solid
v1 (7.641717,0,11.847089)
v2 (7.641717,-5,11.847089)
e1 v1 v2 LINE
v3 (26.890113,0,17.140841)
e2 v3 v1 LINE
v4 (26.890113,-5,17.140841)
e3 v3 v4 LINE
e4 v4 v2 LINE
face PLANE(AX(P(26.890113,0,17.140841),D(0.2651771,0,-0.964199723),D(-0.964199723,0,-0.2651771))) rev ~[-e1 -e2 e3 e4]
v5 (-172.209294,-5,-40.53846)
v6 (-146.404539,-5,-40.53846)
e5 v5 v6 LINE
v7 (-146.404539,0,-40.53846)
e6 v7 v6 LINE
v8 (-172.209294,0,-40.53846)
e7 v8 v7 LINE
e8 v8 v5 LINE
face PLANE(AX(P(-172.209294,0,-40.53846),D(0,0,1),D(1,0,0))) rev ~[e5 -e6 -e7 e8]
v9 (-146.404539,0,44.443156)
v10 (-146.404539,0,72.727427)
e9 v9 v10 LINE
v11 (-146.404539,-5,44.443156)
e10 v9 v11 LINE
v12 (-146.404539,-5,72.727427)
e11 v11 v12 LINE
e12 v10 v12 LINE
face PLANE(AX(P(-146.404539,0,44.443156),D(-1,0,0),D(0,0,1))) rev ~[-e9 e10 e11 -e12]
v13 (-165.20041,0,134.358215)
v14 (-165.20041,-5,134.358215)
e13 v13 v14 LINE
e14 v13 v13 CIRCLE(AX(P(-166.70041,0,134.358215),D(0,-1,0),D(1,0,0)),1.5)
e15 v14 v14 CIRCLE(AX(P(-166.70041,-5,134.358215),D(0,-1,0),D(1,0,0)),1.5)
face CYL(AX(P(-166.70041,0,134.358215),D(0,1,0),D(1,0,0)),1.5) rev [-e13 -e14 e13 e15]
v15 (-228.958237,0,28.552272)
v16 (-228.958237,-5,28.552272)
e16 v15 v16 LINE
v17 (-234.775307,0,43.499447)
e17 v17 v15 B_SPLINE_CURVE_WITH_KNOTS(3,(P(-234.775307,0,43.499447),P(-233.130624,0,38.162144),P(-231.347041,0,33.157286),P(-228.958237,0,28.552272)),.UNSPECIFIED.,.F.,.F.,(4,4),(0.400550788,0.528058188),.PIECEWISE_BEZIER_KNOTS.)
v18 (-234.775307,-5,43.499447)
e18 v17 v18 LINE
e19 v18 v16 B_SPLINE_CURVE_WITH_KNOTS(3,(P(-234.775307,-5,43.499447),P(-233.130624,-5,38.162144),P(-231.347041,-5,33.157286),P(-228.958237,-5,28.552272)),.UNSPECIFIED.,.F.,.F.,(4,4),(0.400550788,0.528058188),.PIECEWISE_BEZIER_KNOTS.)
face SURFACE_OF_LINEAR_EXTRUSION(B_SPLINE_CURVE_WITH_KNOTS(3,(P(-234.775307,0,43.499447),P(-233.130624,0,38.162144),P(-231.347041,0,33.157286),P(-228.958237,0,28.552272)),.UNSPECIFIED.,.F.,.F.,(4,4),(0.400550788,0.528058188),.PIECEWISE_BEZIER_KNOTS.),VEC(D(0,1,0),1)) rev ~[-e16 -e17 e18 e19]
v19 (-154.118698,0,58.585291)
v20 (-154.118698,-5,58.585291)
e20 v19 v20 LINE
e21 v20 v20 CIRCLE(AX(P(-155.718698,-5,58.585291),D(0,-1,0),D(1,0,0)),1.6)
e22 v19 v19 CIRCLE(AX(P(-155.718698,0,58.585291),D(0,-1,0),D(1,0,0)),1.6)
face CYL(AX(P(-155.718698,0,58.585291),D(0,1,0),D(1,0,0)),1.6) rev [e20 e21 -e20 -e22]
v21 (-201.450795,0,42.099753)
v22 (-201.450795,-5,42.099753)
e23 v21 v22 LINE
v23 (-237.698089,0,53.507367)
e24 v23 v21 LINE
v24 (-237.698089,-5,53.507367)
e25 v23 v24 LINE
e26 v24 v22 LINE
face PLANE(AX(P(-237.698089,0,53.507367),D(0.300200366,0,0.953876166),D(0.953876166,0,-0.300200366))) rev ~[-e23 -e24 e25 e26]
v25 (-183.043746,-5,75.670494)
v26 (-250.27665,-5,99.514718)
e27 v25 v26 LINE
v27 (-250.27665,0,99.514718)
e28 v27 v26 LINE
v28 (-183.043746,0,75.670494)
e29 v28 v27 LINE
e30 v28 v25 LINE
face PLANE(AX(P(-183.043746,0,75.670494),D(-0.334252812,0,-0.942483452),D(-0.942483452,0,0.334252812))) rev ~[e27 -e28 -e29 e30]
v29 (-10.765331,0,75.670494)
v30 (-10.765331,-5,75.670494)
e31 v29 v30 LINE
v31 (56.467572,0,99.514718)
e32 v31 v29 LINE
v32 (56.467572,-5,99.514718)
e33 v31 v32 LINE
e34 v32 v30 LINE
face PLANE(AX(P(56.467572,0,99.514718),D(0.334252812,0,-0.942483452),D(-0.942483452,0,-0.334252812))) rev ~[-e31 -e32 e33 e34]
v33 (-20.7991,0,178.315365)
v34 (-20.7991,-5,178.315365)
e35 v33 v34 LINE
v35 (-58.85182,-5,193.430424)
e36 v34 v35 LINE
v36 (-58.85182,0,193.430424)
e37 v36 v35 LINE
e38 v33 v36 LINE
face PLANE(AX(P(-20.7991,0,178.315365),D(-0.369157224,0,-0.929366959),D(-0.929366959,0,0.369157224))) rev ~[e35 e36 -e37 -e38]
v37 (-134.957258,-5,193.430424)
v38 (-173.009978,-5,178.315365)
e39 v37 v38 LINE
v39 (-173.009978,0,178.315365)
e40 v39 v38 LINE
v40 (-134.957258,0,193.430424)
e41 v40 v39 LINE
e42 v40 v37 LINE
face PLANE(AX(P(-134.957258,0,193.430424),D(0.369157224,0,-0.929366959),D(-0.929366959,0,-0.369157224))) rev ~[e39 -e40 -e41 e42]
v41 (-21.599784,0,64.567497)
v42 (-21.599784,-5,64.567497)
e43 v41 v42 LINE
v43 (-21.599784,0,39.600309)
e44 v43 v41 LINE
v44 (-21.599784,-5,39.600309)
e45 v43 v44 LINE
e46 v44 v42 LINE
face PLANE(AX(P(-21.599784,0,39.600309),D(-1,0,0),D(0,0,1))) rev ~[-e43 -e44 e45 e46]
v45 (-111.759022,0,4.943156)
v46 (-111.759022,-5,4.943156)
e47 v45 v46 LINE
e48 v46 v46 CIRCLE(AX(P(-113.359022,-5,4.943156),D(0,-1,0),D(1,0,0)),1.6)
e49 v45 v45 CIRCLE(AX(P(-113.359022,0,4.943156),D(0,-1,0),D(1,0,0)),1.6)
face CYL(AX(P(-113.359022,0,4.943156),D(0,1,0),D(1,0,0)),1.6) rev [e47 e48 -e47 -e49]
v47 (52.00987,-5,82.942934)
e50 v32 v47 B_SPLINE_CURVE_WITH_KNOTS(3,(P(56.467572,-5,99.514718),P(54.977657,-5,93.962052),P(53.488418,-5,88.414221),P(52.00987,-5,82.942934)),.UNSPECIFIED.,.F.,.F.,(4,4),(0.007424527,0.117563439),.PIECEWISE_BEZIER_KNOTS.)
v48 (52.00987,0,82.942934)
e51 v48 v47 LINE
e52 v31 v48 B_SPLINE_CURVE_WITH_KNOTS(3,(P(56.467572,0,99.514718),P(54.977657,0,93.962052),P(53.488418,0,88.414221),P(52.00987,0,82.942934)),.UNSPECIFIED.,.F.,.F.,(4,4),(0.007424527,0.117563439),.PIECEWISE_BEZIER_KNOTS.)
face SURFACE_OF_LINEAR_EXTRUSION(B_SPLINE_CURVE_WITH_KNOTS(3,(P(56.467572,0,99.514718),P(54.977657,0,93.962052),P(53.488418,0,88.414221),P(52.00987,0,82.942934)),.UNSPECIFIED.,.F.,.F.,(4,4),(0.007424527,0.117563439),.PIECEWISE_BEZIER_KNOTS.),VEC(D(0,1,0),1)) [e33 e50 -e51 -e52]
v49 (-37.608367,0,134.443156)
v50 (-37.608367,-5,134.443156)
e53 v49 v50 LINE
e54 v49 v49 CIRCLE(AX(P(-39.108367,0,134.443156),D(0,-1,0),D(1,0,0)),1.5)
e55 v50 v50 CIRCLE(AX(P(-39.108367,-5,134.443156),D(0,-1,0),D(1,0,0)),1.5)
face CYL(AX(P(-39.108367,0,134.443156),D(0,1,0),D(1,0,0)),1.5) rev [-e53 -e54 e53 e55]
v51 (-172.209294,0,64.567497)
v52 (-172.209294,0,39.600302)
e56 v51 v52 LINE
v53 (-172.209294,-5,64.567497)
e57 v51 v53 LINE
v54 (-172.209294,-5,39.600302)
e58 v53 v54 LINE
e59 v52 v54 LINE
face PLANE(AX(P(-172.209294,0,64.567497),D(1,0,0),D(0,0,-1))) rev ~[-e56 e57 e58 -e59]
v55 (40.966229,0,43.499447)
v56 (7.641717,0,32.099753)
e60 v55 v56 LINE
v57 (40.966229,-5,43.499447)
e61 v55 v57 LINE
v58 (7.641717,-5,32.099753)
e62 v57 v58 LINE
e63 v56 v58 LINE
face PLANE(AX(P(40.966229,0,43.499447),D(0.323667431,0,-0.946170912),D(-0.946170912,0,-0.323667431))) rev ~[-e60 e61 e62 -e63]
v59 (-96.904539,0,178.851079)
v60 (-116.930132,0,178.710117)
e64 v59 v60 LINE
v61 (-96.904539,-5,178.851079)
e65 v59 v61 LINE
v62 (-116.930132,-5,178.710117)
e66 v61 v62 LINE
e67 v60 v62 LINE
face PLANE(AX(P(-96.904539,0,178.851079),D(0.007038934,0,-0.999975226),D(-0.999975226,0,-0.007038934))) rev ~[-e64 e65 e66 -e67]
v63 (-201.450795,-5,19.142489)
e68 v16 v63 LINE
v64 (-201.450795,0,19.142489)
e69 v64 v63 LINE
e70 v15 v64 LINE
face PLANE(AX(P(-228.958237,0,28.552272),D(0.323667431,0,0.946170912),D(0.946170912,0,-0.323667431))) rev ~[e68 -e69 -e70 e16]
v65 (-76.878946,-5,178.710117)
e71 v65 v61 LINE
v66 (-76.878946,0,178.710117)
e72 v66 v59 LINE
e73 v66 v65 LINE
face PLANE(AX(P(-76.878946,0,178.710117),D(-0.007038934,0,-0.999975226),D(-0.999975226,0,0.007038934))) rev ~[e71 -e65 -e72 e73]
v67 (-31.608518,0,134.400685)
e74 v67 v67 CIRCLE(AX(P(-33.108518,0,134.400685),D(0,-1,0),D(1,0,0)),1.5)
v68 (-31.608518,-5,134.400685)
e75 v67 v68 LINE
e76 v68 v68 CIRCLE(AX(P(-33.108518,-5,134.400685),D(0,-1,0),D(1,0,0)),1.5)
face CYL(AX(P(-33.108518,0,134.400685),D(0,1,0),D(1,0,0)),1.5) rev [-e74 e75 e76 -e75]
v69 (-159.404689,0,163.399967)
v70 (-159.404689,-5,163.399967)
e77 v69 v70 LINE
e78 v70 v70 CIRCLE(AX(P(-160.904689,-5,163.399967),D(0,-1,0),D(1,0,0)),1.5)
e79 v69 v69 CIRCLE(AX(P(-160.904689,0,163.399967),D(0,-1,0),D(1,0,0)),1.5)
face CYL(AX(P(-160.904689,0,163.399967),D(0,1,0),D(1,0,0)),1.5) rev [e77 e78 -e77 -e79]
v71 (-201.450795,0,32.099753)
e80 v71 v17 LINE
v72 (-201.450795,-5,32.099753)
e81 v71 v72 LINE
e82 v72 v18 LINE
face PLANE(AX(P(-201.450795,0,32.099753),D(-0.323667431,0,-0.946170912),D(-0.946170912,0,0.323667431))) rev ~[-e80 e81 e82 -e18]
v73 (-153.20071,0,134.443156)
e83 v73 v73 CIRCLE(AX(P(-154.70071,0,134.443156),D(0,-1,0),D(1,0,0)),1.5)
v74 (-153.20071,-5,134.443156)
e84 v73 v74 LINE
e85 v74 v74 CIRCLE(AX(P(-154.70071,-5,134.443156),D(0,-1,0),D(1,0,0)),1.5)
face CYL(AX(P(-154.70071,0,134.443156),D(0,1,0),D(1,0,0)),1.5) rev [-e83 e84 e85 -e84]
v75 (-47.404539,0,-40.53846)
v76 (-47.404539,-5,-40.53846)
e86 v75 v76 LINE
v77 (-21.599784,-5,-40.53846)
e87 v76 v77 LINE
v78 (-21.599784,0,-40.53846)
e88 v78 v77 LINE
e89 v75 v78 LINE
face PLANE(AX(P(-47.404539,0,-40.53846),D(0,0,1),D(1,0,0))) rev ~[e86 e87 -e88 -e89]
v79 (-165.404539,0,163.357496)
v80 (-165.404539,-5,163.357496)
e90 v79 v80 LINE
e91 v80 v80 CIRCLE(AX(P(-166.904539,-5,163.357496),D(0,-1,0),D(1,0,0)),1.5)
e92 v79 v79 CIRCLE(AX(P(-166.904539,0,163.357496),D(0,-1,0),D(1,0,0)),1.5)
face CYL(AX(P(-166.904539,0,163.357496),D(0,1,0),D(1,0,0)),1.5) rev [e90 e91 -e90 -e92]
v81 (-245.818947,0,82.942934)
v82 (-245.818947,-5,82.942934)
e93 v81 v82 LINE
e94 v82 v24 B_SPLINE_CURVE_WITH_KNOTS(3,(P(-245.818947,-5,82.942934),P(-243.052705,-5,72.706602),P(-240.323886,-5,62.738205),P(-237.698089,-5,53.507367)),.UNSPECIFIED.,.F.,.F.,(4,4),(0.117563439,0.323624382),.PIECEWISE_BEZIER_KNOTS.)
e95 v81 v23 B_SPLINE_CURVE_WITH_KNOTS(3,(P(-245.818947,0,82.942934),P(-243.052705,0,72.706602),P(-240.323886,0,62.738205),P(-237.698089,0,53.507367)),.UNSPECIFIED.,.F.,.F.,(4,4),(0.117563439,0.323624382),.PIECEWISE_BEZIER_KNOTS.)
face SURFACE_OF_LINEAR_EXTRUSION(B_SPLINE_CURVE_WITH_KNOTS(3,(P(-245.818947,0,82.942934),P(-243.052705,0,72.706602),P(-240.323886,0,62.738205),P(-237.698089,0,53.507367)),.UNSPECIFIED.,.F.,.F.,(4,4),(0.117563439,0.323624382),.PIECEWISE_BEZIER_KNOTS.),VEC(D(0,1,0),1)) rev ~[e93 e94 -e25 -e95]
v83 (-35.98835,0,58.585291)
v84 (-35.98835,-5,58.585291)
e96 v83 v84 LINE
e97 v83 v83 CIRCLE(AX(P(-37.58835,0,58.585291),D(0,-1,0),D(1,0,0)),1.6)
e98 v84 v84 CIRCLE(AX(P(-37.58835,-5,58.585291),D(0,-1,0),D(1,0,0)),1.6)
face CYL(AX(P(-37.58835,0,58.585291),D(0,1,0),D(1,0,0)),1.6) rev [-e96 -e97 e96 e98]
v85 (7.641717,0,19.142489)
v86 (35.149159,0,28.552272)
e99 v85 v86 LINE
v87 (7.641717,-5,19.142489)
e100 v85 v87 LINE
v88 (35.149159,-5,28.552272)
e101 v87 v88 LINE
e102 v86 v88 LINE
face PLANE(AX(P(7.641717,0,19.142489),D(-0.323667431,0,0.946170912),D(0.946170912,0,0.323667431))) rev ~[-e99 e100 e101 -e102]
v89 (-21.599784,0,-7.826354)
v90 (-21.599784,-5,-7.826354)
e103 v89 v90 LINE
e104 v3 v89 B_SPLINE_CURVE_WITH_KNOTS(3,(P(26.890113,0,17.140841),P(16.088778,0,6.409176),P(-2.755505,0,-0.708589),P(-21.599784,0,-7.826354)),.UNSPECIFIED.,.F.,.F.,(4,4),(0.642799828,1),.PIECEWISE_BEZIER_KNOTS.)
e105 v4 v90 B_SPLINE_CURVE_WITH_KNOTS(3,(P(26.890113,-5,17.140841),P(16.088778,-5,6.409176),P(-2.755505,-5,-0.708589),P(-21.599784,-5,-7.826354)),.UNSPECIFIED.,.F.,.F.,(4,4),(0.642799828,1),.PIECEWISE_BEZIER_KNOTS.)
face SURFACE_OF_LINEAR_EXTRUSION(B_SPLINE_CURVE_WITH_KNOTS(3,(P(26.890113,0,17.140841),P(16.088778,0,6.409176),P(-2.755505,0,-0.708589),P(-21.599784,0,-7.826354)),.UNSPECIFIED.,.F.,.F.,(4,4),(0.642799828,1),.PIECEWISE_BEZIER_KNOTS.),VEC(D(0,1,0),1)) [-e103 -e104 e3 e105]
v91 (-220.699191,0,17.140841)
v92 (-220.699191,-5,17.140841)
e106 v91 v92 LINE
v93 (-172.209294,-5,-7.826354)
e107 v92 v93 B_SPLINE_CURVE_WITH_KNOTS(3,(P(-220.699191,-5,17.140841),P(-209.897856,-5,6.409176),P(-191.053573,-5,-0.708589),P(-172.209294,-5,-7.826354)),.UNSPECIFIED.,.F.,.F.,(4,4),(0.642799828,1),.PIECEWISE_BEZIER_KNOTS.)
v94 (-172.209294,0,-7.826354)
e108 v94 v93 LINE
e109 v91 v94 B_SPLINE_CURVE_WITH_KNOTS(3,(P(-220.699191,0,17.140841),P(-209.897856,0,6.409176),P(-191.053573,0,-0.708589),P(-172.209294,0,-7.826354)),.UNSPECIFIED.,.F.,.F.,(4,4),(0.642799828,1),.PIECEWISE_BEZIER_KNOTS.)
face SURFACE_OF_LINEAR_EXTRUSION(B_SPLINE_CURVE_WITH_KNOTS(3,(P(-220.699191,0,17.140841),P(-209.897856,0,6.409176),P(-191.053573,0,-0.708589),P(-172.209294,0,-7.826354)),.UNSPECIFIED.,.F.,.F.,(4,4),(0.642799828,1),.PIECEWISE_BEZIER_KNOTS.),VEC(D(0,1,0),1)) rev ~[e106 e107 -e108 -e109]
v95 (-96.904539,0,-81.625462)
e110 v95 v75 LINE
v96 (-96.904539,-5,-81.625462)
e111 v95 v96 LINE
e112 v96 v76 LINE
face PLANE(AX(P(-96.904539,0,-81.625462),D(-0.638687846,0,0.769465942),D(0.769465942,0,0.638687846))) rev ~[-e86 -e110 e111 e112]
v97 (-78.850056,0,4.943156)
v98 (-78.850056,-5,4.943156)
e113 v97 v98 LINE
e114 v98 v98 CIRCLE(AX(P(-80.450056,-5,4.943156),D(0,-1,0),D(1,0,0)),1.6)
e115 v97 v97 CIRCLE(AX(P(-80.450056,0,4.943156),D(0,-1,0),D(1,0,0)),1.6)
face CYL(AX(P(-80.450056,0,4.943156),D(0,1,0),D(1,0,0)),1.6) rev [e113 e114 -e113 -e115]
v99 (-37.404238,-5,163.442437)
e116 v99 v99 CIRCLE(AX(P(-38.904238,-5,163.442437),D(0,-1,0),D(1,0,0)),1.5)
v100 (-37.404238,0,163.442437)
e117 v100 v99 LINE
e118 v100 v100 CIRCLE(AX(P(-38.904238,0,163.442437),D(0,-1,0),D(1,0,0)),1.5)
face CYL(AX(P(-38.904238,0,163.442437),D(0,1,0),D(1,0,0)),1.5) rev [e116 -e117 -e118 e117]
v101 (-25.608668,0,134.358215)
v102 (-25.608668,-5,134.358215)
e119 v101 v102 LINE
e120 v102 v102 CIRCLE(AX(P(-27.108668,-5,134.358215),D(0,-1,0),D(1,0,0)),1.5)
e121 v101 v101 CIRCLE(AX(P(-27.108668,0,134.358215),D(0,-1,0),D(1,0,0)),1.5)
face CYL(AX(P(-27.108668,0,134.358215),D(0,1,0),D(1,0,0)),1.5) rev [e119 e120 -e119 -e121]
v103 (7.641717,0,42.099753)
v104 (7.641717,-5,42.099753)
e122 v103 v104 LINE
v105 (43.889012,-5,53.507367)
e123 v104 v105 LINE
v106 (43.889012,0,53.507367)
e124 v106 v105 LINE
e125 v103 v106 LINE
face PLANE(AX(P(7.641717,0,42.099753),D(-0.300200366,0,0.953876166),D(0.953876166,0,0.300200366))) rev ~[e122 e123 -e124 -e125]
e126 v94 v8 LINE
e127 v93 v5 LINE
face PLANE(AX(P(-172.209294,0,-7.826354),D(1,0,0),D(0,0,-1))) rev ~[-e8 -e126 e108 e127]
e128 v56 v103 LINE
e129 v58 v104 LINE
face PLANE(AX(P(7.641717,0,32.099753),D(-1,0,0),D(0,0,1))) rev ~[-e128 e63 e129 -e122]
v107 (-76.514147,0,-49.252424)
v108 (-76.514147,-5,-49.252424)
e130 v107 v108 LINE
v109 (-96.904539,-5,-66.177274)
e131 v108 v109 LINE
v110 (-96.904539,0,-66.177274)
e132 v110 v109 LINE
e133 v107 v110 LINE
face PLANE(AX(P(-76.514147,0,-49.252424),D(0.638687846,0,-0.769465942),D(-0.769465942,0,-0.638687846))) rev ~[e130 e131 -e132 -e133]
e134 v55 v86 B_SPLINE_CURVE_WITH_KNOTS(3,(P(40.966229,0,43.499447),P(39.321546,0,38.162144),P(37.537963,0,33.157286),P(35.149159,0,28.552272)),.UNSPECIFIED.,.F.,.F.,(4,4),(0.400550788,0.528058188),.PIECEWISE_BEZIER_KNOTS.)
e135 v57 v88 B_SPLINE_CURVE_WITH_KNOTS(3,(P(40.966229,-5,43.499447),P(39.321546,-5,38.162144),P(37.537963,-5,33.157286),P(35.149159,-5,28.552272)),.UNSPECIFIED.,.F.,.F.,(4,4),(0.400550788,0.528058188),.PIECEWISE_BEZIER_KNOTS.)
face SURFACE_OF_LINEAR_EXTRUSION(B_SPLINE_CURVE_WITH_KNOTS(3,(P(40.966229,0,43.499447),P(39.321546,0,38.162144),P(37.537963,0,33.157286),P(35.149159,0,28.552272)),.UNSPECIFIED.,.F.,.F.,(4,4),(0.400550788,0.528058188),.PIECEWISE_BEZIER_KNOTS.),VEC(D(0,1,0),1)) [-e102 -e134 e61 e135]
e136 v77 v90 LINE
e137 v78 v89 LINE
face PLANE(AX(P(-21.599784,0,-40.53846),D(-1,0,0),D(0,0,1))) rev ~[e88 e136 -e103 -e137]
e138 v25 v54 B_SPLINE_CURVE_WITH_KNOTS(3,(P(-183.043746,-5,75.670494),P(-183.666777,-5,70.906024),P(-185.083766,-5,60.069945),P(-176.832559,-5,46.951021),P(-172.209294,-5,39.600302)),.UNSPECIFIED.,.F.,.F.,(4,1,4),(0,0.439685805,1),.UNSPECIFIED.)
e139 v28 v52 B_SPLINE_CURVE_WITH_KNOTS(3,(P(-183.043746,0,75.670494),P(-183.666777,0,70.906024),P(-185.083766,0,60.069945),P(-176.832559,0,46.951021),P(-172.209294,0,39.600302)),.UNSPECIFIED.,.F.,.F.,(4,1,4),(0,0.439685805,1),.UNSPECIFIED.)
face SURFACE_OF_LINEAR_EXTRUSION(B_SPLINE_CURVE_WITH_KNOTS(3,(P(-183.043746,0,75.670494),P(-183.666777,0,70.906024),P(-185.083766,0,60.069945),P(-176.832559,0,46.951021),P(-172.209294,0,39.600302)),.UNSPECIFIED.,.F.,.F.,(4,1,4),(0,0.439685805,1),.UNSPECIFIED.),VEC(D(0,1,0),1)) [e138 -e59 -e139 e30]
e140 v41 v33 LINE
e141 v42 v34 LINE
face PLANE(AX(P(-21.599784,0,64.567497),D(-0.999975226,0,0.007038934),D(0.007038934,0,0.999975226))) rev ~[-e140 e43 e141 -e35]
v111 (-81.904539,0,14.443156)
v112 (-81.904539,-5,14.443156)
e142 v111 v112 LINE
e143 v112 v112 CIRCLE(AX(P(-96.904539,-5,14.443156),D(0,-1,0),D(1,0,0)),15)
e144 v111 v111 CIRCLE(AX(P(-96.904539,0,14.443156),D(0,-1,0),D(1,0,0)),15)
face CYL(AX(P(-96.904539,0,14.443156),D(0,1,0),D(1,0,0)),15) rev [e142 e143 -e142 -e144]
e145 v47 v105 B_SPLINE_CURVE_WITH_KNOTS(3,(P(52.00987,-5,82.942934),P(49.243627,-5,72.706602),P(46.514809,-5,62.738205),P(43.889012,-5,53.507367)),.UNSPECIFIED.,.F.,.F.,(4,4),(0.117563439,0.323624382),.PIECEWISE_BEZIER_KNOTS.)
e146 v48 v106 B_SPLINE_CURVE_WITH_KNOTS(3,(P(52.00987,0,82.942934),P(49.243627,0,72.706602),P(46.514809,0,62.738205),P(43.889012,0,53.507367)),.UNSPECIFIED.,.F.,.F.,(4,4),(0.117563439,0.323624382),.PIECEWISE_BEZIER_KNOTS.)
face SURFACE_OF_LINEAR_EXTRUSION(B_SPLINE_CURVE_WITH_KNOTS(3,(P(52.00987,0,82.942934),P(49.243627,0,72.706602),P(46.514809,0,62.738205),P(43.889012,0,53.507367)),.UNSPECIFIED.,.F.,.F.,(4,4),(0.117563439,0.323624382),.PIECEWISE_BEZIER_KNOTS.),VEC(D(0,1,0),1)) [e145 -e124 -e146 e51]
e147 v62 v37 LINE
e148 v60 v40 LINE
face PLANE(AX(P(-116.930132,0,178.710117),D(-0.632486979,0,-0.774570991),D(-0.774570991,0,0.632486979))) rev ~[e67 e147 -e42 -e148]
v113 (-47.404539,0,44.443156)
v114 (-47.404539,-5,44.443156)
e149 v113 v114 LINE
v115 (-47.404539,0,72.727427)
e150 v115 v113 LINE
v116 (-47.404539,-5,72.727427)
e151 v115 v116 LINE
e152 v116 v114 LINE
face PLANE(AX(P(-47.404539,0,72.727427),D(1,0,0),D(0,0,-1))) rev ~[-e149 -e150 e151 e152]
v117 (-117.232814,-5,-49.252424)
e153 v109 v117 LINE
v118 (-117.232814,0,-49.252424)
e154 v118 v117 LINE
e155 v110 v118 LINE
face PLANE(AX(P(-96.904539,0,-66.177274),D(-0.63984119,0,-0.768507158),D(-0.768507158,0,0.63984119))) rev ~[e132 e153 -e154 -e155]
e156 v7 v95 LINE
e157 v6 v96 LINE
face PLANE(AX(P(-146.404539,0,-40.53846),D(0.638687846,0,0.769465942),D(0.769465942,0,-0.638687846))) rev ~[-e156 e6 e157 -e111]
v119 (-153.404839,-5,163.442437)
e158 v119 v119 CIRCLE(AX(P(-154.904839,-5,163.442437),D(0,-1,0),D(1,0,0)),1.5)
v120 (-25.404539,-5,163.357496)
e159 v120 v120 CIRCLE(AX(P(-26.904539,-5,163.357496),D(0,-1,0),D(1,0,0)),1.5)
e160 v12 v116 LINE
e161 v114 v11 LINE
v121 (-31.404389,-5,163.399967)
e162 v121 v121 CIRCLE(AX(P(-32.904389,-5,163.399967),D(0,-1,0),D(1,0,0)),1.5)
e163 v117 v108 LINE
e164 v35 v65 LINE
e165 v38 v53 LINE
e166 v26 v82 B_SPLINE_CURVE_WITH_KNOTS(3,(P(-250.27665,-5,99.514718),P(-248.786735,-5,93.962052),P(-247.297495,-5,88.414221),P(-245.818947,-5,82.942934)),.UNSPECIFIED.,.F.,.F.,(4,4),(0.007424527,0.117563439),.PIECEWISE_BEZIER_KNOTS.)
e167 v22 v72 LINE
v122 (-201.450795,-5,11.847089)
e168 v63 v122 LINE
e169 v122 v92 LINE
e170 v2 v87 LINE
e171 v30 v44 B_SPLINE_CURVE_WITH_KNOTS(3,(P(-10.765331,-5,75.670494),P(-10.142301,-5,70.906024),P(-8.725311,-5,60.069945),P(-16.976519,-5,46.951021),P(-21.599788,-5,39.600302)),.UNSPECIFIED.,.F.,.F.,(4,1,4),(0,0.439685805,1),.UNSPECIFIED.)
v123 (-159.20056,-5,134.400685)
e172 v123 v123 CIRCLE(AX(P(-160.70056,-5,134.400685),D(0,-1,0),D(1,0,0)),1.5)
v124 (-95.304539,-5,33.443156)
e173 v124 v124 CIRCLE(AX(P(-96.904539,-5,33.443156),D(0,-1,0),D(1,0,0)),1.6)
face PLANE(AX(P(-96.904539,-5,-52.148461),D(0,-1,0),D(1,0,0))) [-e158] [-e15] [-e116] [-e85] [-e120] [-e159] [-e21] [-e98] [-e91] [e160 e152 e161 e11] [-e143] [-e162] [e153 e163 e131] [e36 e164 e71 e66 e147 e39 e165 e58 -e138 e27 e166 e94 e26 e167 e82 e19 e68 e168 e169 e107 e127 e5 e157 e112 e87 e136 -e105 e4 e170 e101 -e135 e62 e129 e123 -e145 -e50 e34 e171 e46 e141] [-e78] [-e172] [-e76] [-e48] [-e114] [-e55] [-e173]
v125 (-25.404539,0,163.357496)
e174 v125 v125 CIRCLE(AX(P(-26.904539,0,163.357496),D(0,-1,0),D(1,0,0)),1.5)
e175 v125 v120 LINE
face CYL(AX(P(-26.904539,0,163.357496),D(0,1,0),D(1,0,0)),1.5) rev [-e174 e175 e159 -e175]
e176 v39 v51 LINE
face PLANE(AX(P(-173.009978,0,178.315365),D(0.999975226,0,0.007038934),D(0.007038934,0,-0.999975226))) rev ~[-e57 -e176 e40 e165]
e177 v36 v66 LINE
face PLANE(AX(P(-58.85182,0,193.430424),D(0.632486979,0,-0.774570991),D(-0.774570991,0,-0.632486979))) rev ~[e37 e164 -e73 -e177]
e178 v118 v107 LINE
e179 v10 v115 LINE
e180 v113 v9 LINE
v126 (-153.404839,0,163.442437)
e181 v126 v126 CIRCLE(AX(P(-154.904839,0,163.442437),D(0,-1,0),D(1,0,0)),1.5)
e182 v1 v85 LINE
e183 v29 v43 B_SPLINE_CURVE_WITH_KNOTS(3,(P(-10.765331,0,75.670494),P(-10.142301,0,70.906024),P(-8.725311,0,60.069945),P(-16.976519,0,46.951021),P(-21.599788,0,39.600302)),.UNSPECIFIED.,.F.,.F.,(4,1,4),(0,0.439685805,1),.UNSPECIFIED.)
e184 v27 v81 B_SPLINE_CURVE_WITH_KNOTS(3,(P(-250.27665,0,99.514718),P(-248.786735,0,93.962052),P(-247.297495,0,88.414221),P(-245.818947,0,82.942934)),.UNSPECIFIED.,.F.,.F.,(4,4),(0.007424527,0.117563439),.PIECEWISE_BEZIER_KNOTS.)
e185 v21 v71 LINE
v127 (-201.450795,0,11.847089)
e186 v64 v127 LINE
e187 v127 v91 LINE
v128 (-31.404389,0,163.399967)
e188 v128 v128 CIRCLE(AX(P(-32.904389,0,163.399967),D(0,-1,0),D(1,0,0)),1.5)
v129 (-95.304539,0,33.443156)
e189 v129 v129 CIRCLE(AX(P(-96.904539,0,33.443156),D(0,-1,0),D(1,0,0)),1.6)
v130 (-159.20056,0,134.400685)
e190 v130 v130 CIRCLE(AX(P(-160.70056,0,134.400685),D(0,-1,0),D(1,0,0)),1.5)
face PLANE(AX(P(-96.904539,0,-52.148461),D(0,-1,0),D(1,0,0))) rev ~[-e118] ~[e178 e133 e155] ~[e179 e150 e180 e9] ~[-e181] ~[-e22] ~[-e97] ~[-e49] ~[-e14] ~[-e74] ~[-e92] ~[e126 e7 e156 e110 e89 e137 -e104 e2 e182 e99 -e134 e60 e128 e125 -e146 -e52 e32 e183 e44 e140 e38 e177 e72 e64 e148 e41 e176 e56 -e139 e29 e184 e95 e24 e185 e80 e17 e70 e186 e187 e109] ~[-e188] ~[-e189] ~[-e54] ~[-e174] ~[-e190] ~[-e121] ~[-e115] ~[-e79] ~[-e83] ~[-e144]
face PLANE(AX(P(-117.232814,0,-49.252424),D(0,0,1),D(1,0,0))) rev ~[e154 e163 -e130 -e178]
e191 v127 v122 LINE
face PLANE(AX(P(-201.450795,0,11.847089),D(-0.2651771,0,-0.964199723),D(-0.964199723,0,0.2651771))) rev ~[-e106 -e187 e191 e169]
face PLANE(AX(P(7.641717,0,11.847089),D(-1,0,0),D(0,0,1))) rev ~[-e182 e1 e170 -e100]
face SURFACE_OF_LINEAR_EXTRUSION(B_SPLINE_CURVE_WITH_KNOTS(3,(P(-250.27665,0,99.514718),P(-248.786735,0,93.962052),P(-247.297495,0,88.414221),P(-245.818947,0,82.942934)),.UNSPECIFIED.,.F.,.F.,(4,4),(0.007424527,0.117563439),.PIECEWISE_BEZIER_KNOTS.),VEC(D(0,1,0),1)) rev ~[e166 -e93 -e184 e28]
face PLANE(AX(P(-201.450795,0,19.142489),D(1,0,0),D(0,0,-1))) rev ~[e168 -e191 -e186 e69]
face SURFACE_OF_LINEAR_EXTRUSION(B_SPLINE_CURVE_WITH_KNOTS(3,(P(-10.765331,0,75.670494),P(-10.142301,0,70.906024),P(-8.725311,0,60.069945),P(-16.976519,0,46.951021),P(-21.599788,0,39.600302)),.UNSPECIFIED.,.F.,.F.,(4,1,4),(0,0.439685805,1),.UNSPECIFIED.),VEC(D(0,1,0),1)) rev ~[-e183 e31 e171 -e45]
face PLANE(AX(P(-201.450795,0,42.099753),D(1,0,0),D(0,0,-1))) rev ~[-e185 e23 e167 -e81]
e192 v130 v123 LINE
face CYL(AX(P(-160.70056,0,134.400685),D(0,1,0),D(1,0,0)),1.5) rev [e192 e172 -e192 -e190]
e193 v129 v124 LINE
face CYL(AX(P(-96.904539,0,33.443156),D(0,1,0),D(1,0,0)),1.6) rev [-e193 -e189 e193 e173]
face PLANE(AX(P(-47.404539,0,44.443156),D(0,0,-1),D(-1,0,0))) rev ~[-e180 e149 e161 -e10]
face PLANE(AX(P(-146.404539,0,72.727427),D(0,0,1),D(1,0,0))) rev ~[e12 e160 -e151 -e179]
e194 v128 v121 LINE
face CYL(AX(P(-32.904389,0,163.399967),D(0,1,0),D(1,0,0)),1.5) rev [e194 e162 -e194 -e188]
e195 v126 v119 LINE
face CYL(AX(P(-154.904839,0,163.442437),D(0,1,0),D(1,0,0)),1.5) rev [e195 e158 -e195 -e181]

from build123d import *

# Parameters (mm, degrees)
F0_R     = 1.6
F0_R_2   = 15
F0_R_3   = 1.5
F1_DEPTH = 5


# Not quite as in the source:
# - ends of sketch curves that miss each other by under 0.0002 mm in the source are joined


with BuildPart() as f1:
    # F0 (on Front) → F1 (new body)
    with BuildSketch(Plane.XZ):
        Polygon((-96.9045388699, -40.5384600163), (-146.4045388699, -40.5384600163), (-96.9045388699, -81.6254615784), (-47.4045388699, -40.5384600163), align=None)
        Polygon((-96.9045388699, -66.1772739545), (-117.2328144312, -49.2524243891), (-76.514147222, -49.2524243891), align=None, mode=Mode.SUBTRACT)
        Polygon((-116.9301321116, 178.7101170527), (-173.0099775762, 178.315364934), (-172.209293991, 64.5674973527), (-172.209293991, 39.6003018865), (-172.209293991, -7.8263543546), (-172.209293991, -40.5384600163), (-146.4045388699, -40.5384600163), (-96.9045388699, -40.5384600163), (-47.4045388699, -40.5384600163), (-21.5997837488, -40.5384600163), (-21.5997837488, -7.8263543546), (-21.5997837488, 39.6003018865), (-21.5997837488, 64.5674973527), (-20.7991001636, 178.315364934), (-76.8789456281, 178.7101170527), (-96.9045388699, 178.851079377), align=None)
        with Locations((-113.3590215418, 4.9431557872)):
            Circle(F0_R, mode=Mode.SUBTRACT)
        with Locations((-96.9045388699, 14.4431557872)):
            Circle(F0_R_2, mode=Mode.SUBTRACT)
        with Locations((-96.9045388699, 33.4431557872)):
            Circle(F0_R, mode=Mode.SUBTRACT)
        with Locations((-80.450056198, 4.9431557872)):
            Circle(F0_R, mode=Mode.SUBTRACT)
        with Locations((-166.7004097796, 134.3582146961)):
            Circle(F0_R_3, mode=Mode.SUBTRACT)
        with Locations((-160.7005600937, 134.4006852416)):
            Circle(F0_R_3, mode=Mode.SUBTRACT)
        with Locations((-154.7007104079, 134.4431557872)):
            Circle(F0_R_3, mode=Mode.SUBTRACT)
        with Locations((-166.9045388699, 163.3574962616)):
            Circle(F0_R_3, mode=Mode.SUBTRACT)
        with Locations((-160.904689184, 163.3999668071)):
            Circle(F0_R_3, mode=Mode.SUBTRACT)
        with Locations((-154.9048394982, 163.4424373527)):
            Circle(F0_R_3, mode=Mode.SUBTRACT)
        Polygon((-160.5466744936, 58.5852914109), (-146.4045388699, 72.7274270346), (-47.4045388699, 72.7274270346), (-33.2624032461, 58.5852914109), (-47.4045388699, 44.4431557872), (-146.4045388699, 44.4431557872), align=None, mode=Mode.SUBTRACT)
        with Locations((-39.1083673318, 134.4431557872)):
            Circle(F0_R_3, mode=Mode.SUBTRACT)
        with Locations((-33.108517646, 134.4006852416)):
            Circle(F0_R_3, mode=Mode.SUBTRACT)
        with Locations((-27.1086679602, 134.3582146961)):
            Circle(F0_R_3, mode=Mode.SUBTRACT)
        with Locations((-38.9042382416, 163.4424373527)):
            Circle(F0_R_3, mode=Mode.SUBTRACT)
        with Locations((-32.9043885557, 163.3999668071)):
            Circle(F0_R_3, mode=Mode.SUBTRACT)
        with Locations((-26.9045388699, 163.3574962616)):
            Circle(F0_R_3, mode=Mode.SUBTRACT)
        with BuildLine():
            add(Edge.make_bspline(
                [(-10.7653314617, 75.6704937657), (-10.1423011883, 70.9060238986), (-8.7253114516, 60.0699454768), (-16.9765192292, 46.9510213145), (-21.5997880701, 39.6003018865)],
                knots=[0, 0, 0, 0, 0.4396858053, 1, 1, 1, 1], degree=3))
            Line((-21.5997880701, 39.6003018865), (-21.5997837488, -7.8263543546))
            add(Edge.make_bspline(
                [(26.8901133537, 17.1408411115), (16.0887779237, 6.4091763607), (-2.7555050732, -0.708588997), (-21.5997837488, -7.8263543546)],
                knots=[0.6427998281, 0.6427998281, 0.6427998281, 0.6427998281, 1, 1, 1, 1], degree=3))
            Line((26.8901133537, 17.1408411115), (7.6417172557, 11.8470894728))
            Line((7.6417172557, 11.8470894728), (7.6417172557, 19.1424891602))
            Line((7.6417172557, 19.1424891602), (35.1491589972, 28.5522722191))
            add(Edge.make_bspline(
                [(40.9662291467, 43.4994469848), (39.3215463775, 38.1621436215), (37.5379634129, 33.1572861433), (35.1491589972, 28.5522722191)],
                knots=[0.4005507879, 0.4005507879, 0.4005507879, 0.4005507879, 0.528058188, 0.528058188, 0.528058188, 0.528058188], degree=3))
            Line((40.9662291467, 43.4994469848), (7.6417172557, 32.0997526626))
            Line((7.6417172557, 32.0997526626), (7.6417172557, 42.0997526626))
            Line((7.6417172557, 42.0997526626), (43.8890115662, 53.5073665746))
            add(Edge.make_bspline(
                [(52.0098697503, 82.9429342223), (49.2436269652, 72.7066022993), (46.514808756, 62.7382046066), (43.8890115662, 53.5073665746)],
                knots=[0.1175634385, 0.1175634385, 0.1175634385, 0.1175634385, 0.3236243824, 0.3236243824, 0.3236243824, 0.3236243824], degree=3))
            add(Edge.make_bspline(
                [(56.4675719729, 99.5147182414), (54.9776571845, 93.9620524152), (53.4884176136, 88.4142206812), (52.0098697503, 82.9429342223)],
                knots=[0.0074245274, 0.0074245274, 0.0074245274, 0.0074245274, 0.1175634385, 0.1175634385, 0.1175634385, 0.1175634385], degree=3))
            Line((56.4675719729, 99.5147182414), (-10.7653314617, 75.6704937657))
        make_face()
        with BuildLine():
            Line((-172.209293991, -7.8263543546), (-172.209293991, 39.6003018865))
            add(Edge.make_bspline(
                [(-183.043746278, 75.6704937657), (-183.6667765514, 70.9060238986), (-185.0837662881, 60.0699454768), (-176.8325585105, 46.9510213145), (-172.209293991, 39.6003018865)],
                knots=[0, 0, 0, 0, 0.4396858053, 1, 1, 1, 1], degree=3))
            Line((-183.043746278, 75.6704937657), (-250.2766497126, 99.5147182414))
            add(Edge.make_bspline(
                [(-250.2766497126, 99.5147182414), (-248.7867349243, 93.9620524152), (-247.2974953533, 88.4142206812), (-245.81894749, 82.9429342223)],
                knots=[0.0074245274, 0.0074245274, 0.0074245274, 0.0074245274, 0.1175634385, 0.1175634385, 0.1175634385, 0.1175634385], degree=3))
            add(Edge.make_bspline(
                [(-245.81894749, 82.9429342223), (-243.0527047049, 72.7066022993), (-240.3238864957, 62.7382046066), (-237.6980893059, 53.5073665746)],
                knots=[0.1175634385, 0.1175634385, 0.1175634385, 0.1175634385, 0.3236243824, 0.3236243824, 0.3236243824, 0.3236243824], degree=3))
            Line((-237.6980893059, 53.5073665746), (-201.4507949954, 42.0997526626))
            Line((-201.4507949954, 42.0997526626), (-201.4507949954, 32.0997526626))
            Line((-201.4507949954, 32.0997526626), (-234.7753068864, 43.4994469848))
            add(Edge.make_bspline(
                [(-234.7753068864, 43.4994469848), (-233.1306241172, 38.1621436215), (-231.3470411526, 33.1572861433), (-228.9582367369, 28.5522722191)],
                knots=[0.4005507879, 0.4005507879, 0.4005507879, 0.4005507879, 0.528058188, 0.528058188, 0.528058188, 0.528058188], degree=3))
            Line((-228.9582367369, 28.5522722191), (-201.4507949954, 19.1424891602))
            Line((-201.4507949954, 19.1424891602), (-201.4507949954, 11.8470894728))
            Line((-201.4507949954, 11.8470894728), (-220.6991910934, 17.1408411115))
            add(Edge.make_bspline(
                [(-220.6991910934, 17.1408411115), (-209.8978556634, 6.4091763607), (-191.0535726665, -0.708588997), (-172.209293991, -7.8263543546)],
                knots=[0.6427998281, 0.6427998281, 0.6427998281, 0.6427998281, 1, 1, 1, 1], degree=3))
        make_face()
        Polygon((-146.4045388699, 44.4431557872), (-146.4045388699, 72.7274270346), (-160.5466744936, 58.5852914109), align=None)
        with Locations((-155.7186983824, 58.5852914109)):
            Circle(F0_R, mode=Mode.SUBTRACT)
        Polygon((-33.2624032461, 58.5852914109), (-47.4045388699, 72.7274270346), (-47.4045388699, 44.4431557872), align=None)
        with Locations((-37.5883497596, 58.5852914109)):
            Circle(F0_R, mode=Mode.SUBTRACT)
        Polygon((-134.957258223, 193.4304237366), (-173.0099775762, 178.315364934), (-116.9301321116, 178.7101170527), align=None)
        Polygon((-58.8518195167, 193.4304237366), (-76.8789456281, 178.7101170527), (-20.7991001636, 178.315364934), align=None)
    extrude(amount=F1_DEPTH)


solid = f1.part
